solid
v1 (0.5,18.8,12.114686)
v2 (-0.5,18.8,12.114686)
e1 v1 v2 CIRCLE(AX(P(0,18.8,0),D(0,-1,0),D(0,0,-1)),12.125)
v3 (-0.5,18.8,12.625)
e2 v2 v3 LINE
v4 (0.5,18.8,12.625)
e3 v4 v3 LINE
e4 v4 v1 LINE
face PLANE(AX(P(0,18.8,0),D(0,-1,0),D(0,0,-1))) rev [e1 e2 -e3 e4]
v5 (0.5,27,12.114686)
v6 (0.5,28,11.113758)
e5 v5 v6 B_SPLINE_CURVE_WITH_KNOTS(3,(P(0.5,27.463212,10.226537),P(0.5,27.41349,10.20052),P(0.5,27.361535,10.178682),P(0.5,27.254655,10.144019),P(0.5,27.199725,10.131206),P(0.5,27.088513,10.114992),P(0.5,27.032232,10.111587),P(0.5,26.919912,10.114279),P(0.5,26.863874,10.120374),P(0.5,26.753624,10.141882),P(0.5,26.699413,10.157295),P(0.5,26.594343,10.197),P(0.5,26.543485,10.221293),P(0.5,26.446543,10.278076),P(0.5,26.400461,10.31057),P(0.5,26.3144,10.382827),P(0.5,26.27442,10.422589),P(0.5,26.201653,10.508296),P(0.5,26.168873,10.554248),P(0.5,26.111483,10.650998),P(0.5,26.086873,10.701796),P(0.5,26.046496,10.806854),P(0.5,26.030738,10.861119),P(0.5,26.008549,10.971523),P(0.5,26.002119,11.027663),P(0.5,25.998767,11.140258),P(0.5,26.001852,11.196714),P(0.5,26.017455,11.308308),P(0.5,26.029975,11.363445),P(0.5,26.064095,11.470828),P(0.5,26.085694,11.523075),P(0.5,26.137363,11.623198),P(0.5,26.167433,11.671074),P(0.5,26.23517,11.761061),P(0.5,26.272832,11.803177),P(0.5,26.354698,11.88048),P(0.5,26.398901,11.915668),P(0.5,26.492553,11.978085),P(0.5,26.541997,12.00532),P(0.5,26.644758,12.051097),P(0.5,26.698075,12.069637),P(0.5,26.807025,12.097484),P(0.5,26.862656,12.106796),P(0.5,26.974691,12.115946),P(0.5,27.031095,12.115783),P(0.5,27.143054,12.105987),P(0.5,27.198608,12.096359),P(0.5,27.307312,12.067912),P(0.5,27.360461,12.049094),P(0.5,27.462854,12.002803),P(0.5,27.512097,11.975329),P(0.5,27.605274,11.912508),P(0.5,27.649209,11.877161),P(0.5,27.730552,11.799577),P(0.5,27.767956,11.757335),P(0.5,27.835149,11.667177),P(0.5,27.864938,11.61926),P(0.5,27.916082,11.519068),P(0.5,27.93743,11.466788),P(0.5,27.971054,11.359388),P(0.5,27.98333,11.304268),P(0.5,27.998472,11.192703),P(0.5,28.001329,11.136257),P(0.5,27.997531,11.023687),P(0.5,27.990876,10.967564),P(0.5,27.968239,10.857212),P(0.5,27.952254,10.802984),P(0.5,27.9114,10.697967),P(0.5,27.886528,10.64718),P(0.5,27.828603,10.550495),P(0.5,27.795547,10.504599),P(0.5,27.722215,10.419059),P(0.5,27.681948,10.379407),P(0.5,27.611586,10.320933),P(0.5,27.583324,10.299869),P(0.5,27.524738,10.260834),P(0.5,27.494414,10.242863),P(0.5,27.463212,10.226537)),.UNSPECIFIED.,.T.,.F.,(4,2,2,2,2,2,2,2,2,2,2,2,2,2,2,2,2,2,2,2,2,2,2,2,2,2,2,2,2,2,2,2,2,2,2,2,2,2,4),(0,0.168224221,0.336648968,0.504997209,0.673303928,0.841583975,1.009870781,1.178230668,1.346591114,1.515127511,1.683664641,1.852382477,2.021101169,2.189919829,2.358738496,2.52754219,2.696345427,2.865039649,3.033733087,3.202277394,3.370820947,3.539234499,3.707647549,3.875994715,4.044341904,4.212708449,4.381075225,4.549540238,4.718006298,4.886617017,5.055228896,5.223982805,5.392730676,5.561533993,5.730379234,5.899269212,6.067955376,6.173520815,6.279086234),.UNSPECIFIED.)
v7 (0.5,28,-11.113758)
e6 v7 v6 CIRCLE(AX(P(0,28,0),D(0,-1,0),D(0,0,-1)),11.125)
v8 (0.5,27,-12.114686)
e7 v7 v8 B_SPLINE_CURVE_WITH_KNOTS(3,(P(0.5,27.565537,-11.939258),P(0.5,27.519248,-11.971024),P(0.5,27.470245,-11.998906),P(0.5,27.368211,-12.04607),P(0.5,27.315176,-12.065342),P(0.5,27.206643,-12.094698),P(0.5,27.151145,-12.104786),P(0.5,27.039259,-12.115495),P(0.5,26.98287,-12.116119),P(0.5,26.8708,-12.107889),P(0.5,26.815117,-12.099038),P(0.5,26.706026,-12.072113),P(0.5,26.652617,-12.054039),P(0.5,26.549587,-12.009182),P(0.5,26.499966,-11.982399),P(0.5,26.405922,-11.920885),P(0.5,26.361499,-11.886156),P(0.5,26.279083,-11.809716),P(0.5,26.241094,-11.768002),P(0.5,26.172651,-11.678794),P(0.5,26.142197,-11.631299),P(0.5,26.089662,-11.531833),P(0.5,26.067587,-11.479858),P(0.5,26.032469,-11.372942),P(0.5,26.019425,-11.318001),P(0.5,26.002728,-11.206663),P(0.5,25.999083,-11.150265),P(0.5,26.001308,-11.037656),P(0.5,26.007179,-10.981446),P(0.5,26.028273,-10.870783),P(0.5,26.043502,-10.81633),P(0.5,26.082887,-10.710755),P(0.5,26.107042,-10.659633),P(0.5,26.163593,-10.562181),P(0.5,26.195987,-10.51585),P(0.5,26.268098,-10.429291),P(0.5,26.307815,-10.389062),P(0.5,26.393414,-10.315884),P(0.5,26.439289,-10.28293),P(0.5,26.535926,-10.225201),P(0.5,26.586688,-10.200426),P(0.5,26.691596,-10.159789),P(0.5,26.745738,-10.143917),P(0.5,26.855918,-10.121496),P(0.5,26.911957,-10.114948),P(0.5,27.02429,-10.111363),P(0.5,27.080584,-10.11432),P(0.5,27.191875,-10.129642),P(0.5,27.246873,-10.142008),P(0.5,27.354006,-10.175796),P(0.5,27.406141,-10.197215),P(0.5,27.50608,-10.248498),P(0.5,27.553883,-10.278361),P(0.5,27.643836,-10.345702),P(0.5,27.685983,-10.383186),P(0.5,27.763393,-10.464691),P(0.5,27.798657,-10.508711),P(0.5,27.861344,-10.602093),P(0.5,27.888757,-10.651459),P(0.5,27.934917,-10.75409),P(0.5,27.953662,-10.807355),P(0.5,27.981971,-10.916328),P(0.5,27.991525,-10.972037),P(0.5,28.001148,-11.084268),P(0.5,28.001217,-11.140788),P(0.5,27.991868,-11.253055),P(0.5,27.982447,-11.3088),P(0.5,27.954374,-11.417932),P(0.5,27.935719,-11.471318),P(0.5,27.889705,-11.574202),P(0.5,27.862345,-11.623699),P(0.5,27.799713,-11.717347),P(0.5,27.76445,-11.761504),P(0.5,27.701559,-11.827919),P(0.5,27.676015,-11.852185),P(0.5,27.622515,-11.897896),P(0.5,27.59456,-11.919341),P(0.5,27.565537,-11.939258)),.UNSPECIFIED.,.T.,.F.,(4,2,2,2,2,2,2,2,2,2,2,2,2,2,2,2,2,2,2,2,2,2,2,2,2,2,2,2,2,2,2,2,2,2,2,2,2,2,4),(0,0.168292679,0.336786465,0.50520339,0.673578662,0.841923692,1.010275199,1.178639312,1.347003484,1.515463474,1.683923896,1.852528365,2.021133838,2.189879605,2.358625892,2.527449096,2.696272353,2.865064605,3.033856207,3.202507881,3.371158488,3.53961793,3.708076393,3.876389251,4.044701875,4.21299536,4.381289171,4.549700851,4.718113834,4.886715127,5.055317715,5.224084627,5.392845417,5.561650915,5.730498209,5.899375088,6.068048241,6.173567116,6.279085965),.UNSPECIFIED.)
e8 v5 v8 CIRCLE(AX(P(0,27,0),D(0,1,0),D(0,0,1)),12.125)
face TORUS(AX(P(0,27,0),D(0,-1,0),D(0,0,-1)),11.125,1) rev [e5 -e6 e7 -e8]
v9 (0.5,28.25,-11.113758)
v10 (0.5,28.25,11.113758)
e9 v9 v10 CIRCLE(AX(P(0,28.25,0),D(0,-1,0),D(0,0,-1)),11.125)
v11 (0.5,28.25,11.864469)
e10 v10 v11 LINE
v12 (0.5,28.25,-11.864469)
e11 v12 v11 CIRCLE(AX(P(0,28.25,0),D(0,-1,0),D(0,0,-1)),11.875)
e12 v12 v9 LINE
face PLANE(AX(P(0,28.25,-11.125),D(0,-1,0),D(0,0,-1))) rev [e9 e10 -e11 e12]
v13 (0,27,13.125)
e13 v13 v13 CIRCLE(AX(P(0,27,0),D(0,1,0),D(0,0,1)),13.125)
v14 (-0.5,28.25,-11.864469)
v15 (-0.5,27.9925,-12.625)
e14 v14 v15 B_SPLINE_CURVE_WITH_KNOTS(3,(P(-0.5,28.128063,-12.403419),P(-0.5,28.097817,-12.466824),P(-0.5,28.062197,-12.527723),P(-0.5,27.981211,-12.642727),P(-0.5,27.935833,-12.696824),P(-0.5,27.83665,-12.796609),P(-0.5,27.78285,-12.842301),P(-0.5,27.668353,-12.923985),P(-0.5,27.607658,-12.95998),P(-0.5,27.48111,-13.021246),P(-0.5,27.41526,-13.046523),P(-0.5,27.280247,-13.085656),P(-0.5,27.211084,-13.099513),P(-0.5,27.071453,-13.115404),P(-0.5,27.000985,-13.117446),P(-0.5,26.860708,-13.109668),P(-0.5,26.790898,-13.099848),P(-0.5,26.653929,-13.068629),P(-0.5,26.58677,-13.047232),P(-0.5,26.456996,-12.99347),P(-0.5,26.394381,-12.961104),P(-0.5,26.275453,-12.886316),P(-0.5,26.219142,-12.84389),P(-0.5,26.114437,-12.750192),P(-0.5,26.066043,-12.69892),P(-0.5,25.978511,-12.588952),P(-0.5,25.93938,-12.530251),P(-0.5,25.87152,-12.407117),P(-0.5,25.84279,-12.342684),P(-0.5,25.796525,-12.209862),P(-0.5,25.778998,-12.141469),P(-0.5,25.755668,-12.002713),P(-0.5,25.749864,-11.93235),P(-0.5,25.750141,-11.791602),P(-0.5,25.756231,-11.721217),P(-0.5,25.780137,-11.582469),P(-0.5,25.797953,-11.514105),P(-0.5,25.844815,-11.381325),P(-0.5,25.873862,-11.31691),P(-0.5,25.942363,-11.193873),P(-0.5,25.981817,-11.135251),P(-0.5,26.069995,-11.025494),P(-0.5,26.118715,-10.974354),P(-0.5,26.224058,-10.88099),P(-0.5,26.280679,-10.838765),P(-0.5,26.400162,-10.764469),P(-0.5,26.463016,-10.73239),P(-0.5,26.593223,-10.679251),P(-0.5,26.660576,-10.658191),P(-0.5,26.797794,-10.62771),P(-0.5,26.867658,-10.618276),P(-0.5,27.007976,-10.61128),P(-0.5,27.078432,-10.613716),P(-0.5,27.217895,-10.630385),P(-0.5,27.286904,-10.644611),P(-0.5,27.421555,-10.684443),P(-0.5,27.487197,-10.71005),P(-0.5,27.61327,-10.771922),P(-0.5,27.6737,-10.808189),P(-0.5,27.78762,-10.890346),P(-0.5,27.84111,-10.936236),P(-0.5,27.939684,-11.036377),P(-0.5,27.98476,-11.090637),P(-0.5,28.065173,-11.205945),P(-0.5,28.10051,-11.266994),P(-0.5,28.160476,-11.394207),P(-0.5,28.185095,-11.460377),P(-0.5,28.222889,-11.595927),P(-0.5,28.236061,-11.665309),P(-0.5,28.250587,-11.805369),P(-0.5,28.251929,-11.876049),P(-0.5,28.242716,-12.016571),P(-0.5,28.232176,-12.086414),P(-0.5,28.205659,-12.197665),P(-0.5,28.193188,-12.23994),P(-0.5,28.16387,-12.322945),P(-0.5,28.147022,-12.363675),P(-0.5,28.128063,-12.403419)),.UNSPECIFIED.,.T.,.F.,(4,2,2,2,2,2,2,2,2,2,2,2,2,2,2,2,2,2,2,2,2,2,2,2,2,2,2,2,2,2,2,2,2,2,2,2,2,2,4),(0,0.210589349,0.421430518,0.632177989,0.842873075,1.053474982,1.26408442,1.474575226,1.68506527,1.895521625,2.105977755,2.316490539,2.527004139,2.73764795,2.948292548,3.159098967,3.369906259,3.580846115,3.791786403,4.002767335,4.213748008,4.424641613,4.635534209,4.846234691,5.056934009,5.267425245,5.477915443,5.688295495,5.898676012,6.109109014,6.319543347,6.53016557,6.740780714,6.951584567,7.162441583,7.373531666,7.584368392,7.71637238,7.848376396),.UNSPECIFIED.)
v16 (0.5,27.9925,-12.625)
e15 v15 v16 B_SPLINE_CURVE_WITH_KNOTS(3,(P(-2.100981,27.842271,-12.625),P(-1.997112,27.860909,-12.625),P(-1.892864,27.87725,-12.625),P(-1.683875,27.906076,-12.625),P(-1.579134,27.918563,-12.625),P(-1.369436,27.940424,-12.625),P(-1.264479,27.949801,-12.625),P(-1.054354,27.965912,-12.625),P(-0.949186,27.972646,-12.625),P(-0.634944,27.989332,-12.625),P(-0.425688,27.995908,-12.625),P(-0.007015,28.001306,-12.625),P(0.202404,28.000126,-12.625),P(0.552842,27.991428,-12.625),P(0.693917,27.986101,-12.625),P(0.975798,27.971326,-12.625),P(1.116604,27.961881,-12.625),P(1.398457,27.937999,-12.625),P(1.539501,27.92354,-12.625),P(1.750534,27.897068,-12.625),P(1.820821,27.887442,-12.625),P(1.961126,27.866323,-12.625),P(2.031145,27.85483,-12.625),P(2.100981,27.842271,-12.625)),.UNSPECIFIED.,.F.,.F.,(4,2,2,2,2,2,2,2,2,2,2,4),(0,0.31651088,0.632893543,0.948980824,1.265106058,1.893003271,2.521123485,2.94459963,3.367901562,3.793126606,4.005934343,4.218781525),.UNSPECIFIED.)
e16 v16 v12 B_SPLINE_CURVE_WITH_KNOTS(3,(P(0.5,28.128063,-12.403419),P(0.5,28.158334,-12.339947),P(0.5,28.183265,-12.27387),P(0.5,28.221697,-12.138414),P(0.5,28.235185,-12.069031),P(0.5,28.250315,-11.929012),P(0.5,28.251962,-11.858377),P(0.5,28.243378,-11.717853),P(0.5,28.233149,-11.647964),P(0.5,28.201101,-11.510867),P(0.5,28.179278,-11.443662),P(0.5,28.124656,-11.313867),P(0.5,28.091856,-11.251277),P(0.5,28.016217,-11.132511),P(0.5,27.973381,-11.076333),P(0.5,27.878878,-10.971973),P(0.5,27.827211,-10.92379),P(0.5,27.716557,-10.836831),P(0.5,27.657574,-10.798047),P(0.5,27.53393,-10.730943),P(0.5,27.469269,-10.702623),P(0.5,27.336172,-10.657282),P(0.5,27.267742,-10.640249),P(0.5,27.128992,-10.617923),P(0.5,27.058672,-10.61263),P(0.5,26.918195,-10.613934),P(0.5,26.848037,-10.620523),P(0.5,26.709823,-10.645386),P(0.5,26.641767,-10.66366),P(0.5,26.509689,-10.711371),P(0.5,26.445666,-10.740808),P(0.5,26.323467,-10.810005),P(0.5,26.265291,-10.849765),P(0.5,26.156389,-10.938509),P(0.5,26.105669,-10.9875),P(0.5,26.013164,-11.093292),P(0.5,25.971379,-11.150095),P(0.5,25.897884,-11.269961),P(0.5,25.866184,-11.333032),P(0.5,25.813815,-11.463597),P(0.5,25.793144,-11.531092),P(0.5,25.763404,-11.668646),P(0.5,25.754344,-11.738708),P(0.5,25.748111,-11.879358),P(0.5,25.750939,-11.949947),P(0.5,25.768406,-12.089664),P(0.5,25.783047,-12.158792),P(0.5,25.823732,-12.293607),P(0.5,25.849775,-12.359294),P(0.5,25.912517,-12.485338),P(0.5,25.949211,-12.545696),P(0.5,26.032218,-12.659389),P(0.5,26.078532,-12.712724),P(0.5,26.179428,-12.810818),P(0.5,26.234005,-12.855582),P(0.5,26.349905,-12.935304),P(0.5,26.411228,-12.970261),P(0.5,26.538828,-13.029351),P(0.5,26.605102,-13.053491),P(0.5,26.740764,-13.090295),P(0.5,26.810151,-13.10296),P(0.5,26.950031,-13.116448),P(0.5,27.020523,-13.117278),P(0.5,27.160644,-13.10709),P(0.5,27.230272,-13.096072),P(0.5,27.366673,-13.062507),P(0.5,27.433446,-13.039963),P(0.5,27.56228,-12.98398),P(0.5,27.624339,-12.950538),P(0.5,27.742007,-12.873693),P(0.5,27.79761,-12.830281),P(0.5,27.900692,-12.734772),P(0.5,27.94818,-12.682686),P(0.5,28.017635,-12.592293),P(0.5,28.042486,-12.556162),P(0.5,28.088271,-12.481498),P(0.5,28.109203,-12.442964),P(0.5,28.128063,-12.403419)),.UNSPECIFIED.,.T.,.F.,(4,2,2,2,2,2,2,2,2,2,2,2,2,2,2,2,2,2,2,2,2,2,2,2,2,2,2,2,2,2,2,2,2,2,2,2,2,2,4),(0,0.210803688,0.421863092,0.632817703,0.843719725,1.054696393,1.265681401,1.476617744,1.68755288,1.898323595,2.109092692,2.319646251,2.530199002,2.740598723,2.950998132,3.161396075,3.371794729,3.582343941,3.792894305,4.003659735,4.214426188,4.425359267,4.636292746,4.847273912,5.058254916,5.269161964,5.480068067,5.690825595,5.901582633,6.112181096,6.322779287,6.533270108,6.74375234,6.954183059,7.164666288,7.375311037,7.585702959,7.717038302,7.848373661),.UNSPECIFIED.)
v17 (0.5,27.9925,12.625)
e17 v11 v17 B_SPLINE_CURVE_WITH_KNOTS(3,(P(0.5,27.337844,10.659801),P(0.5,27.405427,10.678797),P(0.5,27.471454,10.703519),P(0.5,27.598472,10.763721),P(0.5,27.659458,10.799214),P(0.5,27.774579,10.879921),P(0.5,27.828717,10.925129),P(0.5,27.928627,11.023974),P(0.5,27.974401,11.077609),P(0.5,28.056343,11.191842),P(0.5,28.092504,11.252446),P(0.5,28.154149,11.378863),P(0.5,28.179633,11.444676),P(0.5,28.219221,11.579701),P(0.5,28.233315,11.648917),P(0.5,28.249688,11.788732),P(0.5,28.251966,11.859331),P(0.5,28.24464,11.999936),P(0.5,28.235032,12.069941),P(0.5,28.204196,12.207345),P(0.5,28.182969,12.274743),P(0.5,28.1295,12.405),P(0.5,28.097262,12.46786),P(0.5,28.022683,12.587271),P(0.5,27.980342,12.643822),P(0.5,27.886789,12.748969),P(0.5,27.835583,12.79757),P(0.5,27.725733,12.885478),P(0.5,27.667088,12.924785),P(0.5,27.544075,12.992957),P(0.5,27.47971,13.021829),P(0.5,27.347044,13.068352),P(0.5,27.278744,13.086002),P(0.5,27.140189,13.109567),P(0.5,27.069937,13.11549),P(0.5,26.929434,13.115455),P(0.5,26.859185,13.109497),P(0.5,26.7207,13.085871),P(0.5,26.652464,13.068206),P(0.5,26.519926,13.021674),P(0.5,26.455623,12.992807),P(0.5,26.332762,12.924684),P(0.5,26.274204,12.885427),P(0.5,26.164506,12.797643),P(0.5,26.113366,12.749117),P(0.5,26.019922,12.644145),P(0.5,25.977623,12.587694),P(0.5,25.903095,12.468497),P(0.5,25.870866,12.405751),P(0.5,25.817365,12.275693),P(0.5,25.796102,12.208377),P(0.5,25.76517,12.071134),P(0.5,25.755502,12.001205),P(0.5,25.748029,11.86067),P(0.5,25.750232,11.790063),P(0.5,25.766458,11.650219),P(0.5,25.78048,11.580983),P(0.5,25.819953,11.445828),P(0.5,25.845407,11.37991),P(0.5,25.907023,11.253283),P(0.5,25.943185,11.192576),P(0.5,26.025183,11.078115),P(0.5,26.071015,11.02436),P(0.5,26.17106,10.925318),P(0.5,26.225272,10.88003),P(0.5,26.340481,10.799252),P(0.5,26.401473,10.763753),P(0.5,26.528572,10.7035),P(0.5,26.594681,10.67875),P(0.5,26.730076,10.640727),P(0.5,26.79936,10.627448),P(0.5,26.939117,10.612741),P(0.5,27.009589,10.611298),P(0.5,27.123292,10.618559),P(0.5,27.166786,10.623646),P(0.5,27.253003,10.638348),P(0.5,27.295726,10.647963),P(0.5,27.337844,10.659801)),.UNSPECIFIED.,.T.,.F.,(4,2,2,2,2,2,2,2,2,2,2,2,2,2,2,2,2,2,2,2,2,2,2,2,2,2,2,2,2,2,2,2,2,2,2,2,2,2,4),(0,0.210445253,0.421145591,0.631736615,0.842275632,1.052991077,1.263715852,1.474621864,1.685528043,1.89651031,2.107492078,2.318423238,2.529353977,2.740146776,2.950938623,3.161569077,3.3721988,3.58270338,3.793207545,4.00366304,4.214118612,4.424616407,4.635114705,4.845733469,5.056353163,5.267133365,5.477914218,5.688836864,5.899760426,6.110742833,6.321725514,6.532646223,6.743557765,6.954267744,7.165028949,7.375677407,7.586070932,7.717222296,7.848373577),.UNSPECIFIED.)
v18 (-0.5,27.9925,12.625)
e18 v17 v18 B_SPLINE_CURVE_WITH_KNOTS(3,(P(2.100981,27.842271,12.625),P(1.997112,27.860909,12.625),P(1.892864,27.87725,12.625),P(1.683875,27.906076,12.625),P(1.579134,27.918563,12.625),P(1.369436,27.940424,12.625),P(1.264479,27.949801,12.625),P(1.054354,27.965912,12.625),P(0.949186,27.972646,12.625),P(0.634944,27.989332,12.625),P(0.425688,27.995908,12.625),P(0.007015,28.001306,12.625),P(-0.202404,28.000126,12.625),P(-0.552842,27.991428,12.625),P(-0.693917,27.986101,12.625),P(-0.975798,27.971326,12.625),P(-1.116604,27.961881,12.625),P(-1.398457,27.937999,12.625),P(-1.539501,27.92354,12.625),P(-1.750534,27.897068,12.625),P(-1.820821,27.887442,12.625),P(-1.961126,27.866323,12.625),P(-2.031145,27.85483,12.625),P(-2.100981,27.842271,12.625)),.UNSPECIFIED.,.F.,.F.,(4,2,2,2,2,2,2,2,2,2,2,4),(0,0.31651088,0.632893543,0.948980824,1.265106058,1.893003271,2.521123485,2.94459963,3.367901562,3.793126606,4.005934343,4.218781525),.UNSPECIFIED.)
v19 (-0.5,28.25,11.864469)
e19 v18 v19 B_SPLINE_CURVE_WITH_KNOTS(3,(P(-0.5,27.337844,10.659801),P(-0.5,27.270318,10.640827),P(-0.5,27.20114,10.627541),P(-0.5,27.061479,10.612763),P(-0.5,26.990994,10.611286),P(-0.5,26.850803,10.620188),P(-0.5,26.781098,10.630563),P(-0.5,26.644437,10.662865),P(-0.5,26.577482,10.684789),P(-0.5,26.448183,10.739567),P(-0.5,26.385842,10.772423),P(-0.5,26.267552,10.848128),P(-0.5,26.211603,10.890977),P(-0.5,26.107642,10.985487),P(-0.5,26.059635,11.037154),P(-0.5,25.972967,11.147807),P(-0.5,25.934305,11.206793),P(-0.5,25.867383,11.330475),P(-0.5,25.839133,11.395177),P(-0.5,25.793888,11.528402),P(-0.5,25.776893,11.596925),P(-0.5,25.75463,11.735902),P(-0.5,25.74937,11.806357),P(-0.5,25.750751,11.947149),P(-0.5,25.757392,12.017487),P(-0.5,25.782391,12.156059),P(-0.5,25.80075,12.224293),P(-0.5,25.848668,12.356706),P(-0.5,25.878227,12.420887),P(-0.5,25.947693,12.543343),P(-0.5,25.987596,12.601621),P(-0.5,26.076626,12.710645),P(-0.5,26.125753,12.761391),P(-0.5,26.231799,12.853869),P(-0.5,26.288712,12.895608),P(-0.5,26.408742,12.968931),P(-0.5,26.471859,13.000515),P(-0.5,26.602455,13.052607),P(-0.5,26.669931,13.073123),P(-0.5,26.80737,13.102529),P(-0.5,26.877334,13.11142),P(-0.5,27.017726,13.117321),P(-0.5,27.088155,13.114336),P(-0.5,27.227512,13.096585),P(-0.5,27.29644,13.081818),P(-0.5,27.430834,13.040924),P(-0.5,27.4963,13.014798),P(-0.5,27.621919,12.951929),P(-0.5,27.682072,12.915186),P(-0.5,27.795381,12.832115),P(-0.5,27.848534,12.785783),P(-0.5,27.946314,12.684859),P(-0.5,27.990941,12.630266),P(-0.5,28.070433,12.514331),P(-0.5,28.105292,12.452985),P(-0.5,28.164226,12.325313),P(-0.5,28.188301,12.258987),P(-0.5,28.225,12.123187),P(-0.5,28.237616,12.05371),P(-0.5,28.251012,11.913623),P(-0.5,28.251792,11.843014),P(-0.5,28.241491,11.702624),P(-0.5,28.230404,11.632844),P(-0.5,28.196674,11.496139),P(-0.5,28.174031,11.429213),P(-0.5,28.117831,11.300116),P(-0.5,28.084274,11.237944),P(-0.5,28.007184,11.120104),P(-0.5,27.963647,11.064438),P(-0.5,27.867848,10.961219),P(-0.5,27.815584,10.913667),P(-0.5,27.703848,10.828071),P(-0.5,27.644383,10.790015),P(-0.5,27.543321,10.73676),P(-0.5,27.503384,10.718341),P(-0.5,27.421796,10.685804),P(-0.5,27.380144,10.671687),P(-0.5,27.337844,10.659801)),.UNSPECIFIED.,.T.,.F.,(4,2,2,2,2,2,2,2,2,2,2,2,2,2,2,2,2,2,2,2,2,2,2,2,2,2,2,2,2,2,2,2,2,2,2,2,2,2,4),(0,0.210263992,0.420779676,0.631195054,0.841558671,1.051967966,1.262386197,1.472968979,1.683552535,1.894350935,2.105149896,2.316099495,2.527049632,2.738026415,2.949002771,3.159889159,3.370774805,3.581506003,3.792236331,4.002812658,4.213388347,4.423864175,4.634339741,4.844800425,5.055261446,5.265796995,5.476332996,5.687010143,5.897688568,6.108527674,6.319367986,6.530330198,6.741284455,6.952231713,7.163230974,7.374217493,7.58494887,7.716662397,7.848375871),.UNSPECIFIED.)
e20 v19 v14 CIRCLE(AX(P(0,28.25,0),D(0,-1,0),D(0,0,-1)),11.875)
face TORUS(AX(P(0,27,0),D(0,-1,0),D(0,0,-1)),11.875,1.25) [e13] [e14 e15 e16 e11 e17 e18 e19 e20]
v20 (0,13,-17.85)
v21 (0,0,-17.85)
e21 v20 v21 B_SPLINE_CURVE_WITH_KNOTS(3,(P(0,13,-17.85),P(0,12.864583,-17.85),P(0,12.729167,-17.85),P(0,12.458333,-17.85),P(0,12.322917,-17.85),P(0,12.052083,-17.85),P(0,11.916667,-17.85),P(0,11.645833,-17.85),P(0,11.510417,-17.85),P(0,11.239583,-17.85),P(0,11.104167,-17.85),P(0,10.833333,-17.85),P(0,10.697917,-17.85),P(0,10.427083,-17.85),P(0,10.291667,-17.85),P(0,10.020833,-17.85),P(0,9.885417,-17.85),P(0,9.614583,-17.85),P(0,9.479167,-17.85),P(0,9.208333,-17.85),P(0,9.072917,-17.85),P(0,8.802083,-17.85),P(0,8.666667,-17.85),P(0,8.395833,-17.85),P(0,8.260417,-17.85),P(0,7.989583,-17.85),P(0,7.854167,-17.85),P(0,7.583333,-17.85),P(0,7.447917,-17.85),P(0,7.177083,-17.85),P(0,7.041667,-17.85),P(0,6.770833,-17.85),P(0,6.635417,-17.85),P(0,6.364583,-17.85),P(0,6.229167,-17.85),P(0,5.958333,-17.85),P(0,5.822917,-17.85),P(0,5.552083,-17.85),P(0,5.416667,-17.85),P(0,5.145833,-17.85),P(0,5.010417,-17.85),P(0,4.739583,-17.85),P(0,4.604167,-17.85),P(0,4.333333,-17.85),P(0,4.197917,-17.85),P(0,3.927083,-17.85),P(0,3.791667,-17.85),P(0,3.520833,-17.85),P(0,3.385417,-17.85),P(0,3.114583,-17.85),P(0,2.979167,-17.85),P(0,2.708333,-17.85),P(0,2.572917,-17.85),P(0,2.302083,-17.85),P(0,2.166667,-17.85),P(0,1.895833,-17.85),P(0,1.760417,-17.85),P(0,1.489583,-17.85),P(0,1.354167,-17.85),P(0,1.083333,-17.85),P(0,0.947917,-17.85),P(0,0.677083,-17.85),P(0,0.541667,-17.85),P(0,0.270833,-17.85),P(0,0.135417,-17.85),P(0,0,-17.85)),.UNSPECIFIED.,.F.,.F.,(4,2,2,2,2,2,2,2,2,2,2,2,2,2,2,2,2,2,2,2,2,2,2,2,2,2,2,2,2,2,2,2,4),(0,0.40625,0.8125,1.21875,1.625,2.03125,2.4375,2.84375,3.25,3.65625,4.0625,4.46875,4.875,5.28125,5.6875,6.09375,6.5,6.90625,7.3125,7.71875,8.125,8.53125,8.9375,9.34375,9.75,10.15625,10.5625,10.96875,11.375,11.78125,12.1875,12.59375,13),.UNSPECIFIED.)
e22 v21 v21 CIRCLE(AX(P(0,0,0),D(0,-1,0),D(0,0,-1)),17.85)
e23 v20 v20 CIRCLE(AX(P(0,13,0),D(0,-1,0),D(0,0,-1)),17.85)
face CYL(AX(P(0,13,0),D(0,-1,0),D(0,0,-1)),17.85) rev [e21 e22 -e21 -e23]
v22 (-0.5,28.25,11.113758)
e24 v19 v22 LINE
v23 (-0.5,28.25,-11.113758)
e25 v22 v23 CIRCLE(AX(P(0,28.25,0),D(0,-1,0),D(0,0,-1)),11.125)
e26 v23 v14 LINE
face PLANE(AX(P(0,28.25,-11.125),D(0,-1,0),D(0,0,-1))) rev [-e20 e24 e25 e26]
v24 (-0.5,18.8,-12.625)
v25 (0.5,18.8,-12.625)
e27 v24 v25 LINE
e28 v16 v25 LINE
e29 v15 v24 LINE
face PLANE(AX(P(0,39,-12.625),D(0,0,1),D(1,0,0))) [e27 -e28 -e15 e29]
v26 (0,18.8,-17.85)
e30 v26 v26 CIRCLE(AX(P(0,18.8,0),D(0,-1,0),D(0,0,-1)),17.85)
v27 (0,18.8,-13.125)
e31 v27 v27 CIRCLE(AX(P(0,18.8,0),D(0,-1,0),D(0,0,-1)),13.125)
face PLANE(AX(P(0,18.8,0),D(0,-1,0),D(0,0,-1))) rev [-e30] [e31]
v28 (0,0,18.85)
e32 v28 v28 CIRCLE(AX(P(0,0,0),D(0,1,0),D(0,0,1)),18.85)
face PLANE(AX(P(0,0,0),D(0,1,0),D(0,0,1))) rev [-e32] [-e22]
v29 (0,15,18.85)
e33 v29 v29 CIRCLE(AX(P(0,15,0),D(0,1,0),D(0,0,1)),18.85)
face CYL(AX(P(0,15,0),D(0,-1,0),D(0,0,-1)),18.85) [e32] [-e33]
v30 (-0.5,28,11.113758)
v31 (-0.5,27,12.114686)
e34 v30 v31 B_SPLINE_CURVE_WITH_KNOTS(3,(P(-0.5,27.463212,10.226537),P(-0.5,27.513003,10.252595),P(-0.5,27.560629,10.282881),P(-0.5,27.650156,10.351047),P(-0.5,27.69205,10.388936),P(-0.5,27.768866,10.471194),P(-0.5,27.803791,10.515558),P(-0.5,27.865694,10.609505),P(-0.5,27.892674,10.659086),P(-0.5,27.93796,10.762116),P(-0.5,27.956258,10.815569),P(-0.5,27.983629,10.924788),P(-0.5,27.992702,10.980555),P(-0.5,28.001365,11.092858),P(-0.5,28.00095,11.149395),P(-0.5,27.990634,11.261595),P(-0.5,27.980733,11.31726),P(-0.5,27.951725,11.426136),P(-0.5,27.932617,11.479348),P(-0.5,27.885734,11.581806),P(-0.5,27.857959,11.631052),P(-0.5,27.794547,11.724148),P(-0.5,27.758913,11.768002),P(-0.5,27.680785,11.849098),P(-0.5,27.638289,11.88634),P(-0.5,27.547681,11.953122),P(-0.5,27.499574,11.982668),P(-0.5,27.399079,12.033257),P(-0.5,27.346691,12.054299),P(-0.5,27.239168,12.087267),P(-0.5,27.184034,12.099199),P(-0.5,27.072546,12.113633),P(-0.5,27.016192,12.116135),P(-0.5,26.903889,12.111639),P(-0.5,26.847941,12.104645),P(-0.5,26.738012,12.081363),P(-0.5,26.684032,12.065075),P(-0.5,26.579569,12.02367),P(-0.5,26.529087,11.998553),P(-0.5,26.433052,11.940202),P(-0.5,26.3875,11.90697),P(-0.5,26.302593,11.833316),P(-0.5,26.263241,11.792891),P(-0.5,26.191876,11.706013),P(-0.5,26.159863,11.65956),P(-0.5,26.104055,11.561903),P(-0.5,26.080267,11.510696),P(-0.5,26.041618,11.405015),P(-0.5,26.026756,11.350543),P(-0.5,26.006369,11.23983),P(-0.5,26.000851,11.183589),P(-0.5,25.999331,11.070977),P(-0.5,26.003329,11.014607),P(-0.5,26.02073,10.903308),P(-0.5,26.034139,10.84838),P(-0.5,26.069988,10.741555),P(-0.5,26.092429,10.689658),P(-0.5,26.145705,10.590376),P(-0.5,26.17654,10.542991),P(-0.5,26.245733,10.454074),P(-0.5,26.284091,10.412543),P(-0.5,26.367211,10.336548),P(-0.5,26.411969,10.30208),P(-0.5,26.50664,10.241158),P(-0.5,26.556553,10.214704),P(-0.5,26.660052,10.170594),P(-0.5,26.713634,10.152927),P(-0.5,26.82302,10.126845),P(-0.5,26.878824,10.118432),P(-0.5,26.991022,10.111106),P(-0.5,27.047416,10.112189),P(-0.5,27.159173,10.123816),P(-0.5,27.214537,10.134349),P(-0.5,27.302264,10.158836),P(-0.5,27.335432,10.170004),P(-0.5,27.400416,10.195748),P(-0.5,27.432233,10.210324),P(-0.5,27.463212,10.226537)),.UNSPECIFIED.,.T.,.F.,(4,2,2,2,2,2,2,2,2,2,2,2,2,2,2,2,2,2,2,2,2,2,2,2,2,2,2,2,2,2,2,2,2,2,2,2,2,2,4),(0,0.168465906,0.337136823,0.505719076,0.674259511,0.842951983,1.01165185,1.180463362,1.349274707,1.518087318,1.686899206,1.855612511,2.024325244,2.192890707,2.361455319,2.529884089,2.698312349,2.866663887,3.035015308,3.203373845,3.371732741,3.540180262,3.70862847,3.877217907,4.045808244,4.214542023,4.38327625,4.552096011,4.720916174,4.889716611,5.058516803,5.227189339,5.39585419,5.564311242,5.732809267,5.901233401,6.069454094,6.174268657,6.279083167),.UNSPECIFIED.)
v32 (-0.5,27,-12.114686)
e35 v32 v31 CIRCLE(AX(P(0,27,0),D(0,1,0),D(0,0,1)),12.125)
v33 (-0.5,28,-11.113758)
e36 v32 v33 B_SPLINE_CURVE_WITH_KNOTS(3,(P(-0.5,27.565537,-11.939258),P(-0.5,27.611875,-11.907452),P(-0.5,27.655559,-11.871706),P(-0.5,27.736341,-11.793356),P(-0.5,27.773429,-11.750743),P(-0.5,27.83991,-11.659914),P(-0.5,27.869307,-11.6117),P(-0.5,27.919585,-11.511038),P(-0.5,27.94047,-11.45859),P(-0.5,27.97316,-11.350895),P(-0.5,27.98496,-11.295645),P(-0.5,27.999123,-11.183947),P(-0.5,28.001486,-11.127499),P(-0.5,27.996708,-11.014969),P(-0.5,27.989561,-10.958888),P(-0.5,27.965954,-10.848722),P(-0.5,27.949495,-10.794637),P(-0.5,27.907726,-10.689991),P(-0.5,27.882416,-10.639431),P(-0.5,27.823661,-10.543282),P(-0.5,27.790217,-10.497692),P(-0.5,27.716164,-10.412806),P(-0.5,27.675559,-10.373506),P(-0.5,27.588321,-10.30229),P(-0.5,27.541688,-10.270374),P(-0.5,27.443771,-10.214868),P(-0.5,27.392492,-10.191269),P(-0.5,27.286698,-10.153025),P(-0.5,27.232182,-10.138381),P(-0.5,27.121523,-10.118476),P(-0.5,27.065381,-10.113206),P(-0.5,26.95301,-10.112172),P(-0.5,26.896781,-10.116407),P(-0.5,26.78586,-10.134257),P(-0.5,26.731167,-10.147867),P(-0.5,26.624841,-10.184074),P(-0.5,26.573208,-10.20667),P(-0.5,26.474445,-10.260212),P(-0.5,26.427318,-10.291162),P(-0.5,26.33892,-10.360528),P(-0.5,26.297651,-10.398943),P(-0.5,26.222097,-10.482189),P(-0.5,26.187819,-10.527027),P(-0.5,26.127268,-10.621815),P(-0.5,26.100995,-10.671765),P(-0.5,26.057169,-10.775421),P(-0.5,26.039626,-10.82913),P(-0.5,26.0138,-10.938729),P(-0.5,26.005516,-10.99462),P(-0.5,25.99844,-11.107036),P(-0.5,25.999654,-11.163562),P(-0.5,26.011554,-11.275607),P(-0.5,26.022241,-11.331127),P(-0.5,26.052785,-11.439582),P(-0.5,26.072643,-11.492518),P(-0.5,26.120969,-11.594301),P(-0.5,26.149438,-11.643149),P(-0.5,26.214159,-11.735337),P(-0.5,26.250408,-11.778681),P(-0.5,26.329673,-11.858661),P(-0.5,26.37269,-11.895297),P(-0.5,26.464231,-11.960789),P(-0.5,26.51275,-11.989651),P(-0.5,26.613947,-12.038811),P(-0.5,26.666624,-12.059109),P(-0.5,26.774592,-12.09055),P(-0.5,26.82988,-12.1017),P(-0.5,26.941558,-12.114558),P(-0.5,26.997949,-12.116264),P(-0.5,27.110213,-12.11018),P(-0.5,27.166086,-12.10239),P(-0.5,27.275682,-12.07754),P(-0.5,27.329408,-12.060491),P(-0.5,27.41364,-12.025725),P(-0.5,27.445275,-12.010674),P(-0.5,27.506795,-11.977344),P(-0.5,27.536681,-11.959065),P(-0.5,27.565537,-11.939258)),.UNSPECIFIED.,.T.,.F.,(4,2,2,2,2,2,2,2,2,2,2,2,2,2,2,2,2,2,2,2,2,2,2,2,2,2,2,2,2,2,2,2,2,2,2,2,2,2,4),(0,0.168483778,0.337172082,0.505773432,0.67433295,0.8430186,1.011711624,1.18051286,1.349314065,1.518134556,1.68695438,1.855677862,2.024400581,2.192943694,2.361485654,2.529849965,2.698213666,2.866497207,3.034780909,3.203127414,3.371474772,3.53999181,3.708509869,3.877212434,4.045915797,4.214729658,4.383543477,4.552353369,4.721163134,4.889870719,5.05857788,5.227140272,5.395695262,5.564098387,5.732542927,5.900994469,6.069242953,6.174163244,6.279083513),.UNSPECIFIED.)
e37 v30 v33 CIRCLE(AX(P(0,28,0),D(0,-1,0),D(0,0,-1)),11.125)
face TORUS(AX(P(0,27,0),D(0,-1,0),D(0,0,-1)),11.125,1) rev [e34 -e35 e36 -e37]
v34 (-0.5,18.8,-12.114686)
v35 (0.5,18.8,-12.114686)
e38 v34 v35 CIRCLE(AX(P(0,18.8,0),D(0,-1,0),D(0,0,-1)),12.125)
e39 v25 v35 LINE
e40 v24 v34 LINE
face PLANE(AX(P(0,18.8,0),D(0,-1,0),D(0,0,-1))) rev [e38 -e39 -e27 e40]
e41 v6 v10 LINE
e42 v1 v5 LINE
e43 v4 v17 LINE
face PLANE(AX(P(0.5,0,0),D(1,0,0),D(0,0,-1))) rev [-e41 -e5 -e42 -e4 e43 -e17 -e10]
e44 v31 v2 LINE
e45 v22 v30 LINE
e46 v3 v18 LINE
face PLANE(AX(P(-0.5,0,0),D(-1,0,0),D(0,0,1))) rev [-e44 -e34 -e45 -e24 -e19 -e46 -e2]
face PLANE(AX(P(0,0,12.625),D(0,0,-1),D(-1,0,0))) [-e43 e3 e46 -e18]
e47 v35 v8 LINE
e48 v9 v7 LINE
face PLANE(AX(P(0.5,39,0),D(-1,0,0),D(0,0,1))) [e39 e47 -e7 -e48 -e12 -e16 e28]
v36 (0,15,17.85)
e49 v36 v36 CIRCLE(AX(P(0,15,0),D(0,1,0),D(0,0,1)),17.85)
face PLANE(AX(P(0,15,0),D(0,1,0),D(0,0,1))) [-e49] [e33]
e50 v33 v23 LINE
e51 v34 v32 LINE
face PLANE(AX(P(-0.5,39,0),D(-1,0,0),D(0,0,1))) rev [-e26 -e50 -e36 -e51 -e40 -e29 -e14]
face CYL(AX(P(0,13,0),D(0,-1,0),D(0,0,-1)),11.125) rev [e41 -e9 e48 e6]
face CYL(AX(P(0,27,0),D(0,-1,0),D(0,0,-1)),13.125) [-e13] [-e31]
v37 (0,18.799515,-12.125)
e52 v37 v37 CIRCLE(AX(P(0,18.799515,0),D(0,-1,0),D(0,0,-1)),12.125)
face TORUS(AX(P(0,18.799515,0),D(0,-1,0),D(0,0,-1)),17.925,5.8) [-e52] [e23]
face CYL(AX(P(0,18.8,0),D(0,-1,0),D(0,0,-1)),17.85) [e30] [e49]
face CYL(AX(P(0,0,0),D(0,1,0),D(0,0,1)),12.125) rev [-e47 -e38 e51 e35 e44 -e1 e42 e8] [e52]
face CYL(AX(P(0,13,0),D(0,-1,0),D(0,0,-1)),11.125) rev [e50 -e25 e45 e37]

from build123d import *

# Parameters (mm, degrees)
SKETCH2_R               = 18.85
BOSS_EXTRUDE1_DEPTH     = 15
SKETCH4_R               = 17.85
CUT_EXTRUDE2_DEPTH      = 13
SKETCH5_R               = 13.125
BOSS_EXTRUDE2_DEPTH     = 12
SKETCH6_R               = 12.125
CUT_EXTRUDE3_DEPTH      = 38.942654098
CUT_EXTRUDE5_DEPTH      = 12
CUT_EXTRUDE5_DEPTH_BACK = 38.942654098
SKETCH11_W              = 1
SKETCH11_H              = 5
CUT_EXTRUDE7_DEPTH      = 31.711683494
BOSS_EXTRUDE4_START     = -5.8
SKETCH12_R              = 17.85
SKETCH12_R_2            = 12.125
BOSS_EXTRUDE4_DEPTH     = 5.8
FILLET3_R               = 5.8


with BuildPart() as part:
    # Sketch2 → Boss-Extrude1 (new body)
    with BuildSketch(Plane(origin=(0, 0, 0), x_dir=(1, 0, 0), z_dir=(0, 1, 0))):
        with Locations(Location((0, 0, 0), (0, 0, 270))):
            Circle(SKETCH2_R)
    extrude(amount=BOSS_EXTRUDE1_DEPTH)

    # Sketch4 → Cut-Extrude2 (cut)
    with BuildSketch(Plane(origin=(0, 0, 0), x_dir=(-1, 0, 0), z_dir=(0, -1, 0))):
        with Locations(Location((0, 0, 0), (0, 0, 90))):
            Circle(SKETCH4_R)
    extrude(amount=-CUT_EXTRUDE2_DEPTH, mode=Mode.SUBTRACT)

    # Sketch5 → Boss-Extrude2 (add)
    with BuildSketch(Plane(origin=(0, 15, 0), x_dir=(1, 0, 0), z_dir=(0, 1, 0))):
        with Locations(Location((0, 0, 0), (0, 0, 270))):
            Circle(SKETCH5_R)
    extrude(amount=BOSS_EXTRUDE2_DEPTH)

    # Sketch6 → Cut-Extrude3 (cut, through all)
    with BuildSketch(Plane(origin=(0, 27, 0), x_dir=(1, 0, 0), z_dir=(0, 1, 0))):
        with Locations(Location((0, 0, 0), (0, 0, 270))):
            Circle(SKETCH6_R)
    extrude(amount=-CUT_EXTRUDE3_DEPTH, mode=Mode.SUBTRACT)

    # Sketch7 → Cut-Extrude5 (cut, two sides: drawn at the far end of the back side and taken through both)
    with BuildSketch(Plane(origin=(0, 27, 0), x_dir=(1, 0, 0), z_dir=(0, 1, 0)).offset(-CUT_EXTRUDE5_DEPTH_BACK)):
        with BuildLine():
            ThreePointArc((-0.5, 12.114686335), (-0.25005318, 12.12242131), (0, 12.125))
            Line((0, 12.125), (0, 12.625))
            Line((0, 12.625), (-0.5, 12.625))
            Line((-0.5, 12.625), (-0.5, 12.114686335))
        make_face()
        with BuildLine():
            Line((0, 12.625), (0, 12.125))
            ThreePointArc((0, 12.125), (0.25005318, 12.12242131), (0.5, 12.114686335))
            Line((0.5, 12.114686335), (0.5, 12.625))
            Line((0.5, 12.625), (0, 12.625))
        make_face()
        with BuildLine():
            Line((0, -12.625), (0, -12.125))
            ThreePointArc((0, -12.125), (-0.25005318, -12.12242131), (-0.5, -12.114686335))
            Line((-0.5, -12.114686335), (-0.5, -12.625))
            Line((-0.5, -12.625), (0, -12.625))
        make_face()
        with BuildLine():
            ThreePointArc((0.5, -12.114686335), (0.25005318, -12.12242131), (0, -12.125))
            Line((0, -12.125), (0, -12.625))
            Line((0, -12.625), (0.5, -12.625))
            Line((0.5, -12.625), (0.5, -12.114686335))
        make_face()
    extrude(amount=CUT_EXTRUDE5_DEPTH + CUT_EXTRUDE5_DEPTH_BACK, mode=Mode.SUBTRACT)

    # Sketch8 → Revolve3 (revolve)
    with BuildSketch(Plane(origin=(0, 27, 0), x_dir=(0, 0, 1), z_dir=(-1, 0, 0))):
        with BuildLine():
            Line((-11.125, 1), (-11.125, 1.25))
            Line((-11.125, 1.25), (-11.875, 1.25))
            ThreePointArc((-11.875, 1.25), (-12.758883476, 0.883883476), (-13.125, 0))
            Line((-13.125, 0), (-12.125, 0))
            ThreePointArc((-12.125, 0), (-11.832106781, 0.707106781), (-11.125, 1))
        make_face()
    revolve(axis=Axis((0, 13, 0), (0, 1, 0)))

    # Sketch11 → Cut-Extrude7 (cut, through all)
    with BuildSketch(Plane.XZ.offset(-13)):
        with Locations((0, -10.125)):
            Rectangle(SKETCH11_W, SKETCH11_H)
        with Locations((0, 10.125)):
            Rectangle(SKETCH11_W, SKETCH11_H)
    extrude(amount=-CUT_EXTRUDE7_DEPTH, mode=Mode.SUBTRACT)

    # Sketch12 → Boss-Extrude4 (add)
    with BuildSketch(Plane(origin=(0, 13, 0), x_dir=(-1, 0, 0), z_dir=(0, -1, 0)).offset(BOSS_EXTRUDE4_START)):
        with Locations(Location((0, 0, 0), (0, 0, 90))):
            Circle(SKETCH12_R)
        with Locations(Location((0, 0, 0), (0, 0, 267.636617298))):
            Circle(SKETCH12_R_2, mode=Mode.SUBTRACT)
    extrude(amount=BOSS_EXTRUDE4_DEPTH)

    # Fillet3
    # the kernel refuses this fillet: 5.8 mm, written as the material it takes off along each edge
    with BuildSketch(Plane(origin=(0, 13, 0), x_dir=(0.04123711340209573, 0, 0.999149388469143), z_dir=(-0.999149388469143, 0, 0.04123711340209573))) as fillet3_piece_1_section:
        with BuildLine():
            CenterArc((12.125 + FILLET3_R, FILLET3_R), FILLET3_R, 180, 90)
            Line((12.125 + FILLET3_R, 0), (12.125, 0))
            Line((12.125, 0), (12.125, FILLET3_R))
        make_face()
    fillet3_piece_1 = revolve(axis=Axis((0, 13, 0), (0, 1, 0)), mode=Mode.PRIVATE)
    fillet3_piece_1 = fillet3_piece_1 & Plane(origin=(0, 14.662321343, 0), x_dir=(0, 0, -1), z_dir=(0, -1, 0)) * Cylinder(17.85, 72, mode=Mode.PRIVATE)
    add(fillet3_piece_1, mode=Mode.SUBTRACT)


solid = part.part
